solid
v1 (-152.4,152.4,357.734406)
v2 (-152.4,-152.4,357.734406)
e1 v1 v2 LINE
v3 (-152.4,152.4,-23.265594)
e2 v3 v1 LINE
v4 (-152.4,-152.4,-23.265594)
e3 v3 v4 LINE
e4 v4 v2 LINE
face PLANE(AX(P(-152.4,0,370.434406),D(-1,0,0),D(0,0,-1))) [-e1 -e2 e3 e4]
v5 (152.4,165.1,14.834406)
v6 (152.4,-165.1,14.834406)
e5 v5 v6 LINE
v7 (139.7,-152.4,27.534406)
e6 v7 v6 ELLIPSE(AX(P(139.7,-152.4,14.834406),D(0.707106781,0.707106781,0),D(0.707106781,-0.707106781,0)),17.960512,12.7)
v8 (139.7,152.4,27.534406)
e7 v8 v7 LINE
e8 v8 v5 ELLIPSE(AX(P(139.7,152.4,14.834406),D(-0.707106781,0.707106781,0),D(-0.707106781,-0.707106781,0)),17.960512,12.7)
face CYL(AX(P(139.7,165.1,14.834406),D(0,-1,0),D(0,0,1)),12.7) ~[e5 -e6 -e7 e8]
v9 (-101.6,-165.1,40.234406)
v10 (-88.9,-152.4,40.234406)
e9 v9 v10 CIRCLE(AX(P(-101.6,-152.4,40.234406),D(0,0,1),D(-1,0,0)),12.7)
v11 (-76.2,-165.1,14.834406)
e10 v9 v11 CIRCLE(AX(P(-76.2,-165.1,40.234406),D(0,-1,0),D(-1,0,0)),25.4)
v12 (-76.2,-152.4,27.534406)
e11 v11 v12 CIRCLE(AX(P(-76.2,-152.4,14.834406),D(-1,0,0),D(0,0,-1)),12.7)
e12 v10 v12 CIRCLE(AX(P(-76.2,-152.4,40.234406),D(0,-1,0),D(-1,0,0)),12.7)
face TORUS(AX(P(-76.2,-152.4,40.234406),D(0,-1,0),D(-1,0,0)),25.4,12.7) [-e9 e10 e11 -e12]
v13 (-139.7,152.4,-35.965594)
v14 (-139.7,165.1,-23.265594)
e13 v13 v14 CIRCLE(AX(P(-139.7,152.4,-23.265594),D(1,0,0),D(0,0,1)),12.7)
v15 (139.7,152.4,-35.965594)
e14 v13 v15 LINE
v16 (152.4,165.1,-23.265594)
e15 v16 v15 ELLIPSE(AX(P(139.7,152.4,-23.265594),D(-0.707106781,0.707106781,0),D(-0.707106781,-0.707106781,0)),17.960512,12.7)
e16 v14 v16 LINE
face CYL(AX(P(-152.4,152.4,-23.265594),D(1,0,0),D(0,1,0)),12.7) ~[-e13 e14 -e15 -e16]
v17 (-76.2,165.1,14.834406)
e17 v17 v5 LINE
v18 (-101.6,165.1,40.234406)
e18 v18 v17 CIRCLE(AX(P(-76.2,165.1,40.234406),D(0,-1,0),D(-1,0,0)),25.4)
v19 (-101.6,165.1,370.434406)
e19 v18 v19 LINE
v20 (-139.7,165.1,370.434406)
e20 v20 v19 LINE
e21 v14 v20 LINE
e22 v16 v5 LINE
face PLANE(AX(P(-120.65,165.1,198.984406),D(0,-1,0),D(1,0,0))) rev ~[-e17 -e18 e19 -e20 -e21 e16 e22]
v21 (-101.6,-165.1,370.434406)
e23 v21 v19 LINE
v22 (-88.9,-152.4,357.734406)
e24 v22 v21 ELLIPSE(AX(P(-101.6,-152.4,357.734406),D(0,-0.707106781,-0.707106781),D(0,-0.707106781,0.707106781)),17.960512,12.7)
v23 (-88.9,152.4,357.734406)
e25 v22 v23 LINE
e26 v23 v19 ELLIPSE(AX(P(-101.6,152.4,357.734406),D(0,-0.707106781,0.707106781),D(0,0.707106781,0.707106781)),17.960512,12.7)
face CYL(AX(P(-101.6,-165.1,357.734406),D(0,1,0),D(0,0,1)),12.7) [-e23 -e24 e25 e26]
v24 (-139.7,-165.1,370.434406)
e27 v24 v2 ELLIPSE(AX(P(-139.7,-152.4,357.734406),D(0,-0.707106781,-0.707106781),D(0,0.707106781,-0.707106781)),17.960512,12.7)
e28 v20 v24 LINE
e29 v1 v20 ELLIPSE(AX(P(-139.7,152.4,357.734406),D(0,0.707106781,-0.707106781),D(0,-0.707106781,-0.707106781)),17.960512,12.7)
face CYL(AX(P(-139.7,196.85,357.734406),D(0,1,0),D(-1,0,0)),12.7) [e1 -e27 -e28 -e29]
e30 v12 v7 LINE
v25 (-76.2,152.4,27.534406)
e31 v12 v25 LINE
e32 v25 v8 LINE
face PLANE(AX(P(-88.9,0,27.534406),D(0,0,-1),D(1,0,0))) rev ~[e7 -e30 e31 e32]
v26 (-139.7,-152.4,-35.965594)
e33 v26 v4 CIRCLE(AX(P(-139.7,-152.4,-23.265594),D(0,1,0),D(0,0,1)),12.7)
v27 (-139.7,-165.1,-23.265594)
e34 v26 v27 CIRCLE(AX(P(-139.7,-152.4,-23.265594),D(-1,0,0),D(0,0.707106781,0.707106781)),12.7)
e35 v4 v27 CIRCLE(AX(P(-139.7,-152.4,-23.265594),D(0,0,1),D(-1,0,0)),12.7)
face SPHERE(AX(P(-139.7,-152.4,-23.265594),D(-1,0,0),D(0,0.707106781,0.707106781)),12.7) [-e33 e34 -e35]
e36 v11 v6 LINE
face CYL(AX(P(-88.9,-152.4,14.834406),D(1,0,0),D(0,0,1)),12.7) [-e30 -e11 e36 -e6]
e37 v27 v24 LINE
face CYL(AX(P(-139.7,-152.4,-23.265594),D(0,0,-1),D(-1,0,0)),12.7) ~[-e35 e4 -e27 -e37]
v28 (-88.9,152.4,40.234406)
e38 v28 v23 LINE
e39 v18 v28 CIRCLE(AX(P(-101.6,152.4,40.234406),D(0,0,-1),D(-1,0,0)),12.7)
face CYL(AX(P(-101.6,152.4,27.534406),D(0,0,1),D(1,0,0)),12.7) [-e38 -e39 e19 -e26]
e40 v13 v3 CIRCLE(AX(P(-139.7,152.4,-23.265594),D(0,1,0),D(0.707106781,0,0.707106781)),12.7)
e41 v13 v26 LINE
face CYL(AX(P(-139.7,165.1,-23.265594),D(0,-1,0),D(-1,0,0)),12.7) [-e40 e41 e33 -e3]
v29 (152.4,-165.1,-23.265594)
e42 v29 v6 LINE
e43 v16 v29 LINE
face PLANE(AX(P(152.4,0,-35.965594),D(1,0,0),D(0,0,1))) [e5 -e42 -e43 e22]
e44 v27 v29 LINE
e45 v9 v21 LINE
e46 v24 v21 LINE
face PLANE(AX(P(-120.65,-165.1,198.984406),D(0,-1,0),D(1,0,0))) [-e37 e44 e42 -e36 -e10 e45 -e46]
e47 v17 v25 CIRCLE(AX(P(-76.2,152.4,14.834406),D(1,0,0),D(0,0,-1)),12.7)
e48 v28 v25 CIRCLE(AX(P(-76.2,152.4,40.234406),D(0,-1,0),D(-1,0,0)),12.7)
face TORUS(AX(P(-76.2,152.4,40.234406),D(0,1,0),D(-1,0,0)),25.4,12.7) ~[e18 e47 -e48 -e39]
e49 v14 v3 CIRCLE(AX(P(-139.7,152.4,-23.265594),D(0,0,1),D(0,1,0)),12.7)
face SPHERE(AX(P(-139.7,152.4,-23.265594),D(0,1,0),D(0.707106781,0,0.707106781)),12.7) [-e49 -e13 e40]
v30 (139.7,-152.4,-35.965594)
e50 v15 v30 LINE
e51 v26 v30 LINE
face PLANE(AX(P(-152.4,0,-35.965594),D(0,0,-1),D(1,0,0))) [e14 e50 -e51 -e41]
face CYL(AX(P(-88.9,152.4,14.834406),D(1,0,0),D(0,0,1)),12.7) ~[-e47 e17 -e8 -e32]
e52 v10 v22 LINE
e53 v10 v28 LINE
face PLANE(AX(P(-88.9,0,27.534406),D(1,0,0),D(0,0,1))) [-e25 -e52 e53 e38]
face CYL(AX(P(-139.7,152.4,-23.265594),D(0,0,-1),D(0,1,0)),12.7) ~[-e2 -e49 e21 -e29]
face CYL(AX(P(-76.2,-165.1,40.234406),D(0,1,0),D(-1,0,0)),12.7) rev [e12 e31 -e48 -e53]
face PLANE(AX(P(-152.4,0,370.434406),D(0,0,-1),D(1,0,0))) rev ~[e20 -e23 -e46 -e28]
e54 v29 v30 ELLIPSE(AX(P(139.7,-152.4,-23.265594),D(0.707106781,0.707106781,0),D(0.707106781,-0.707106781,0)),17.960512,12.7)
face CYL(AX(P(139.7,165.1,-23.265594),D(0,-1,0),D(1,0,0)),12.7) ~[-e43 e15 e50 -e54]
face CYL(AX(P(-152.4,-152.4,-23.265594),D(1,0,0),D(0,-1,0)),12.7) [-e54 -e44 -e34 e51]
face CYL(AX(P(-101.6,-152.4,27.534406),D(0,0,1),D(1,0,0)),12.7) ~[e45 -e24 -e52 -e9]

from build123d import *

# Parameters (mm, degrees)
F0_W         = 63.5
F0_H         = 342.9
F0_H_2       = 63.5
F0_W_2       = 241.3
F1_DEPTH     = 165.1
F2_R         = 12.7
F3_R         = 12.7
F4_T1_DEPTH  = 425.45
F4_T3_DEPTH  = 393.7
F4_S7_W      = 12.7
F4_S7_H      = 12.7
F4_T8_DEPTH  = 12.7
F4_S13_W     = 12.7
F4_S13_H     = 12.7
F4_T14_DEPTH = 12.7


# Not quite as in the source:
# - a fillet or chamfer that OpenCascade refuses, or shapes differently, is made with other operations: its cross-section is extruded or revolved along the edge and cut away or added


with BuildPart() as f1:
    # F0 (on Front) → F1 (new body, symmetric)
    with BuildSketch(Plane.XZ):
        with Locations((-120.65, 198.9844056189)):
            Rectangle(F0_W, F0_H)
        with Locations((-120.65, -4.2155943811)):
            Rectangle(F0_W, F0_H_2)
        with Locations((31.75, -4.2155943811)):
            Rectangle(F0_W_2, F0_H_2)
    extrude(amount=F1_DEPTH, both=True)

    # F2
    f2_edges = [f1.edges().sort_by_distance(p)[0] for p in [
        (31.75, -165.1, 27.534406),
        (152.4, 0, 27.534406),
        (31.75, 165.1, 27.534406),
        (-88.9, 0, 27.534406),
        (-88.9, 165.1, 198.984406),
        (-88.9, -165.1, 198.984406),
        (-88.9, 0, 370.434406),
    ]]
    fillet(f2_edges, radius=F2_R)

    # F3
    f3_edges = [f1.edges().sort_by_distance(p)[0] for p in [
        (0, -165.1, -35.965594),
        (152.4, 0, -35.965594),
        (0, 165.1, -35.965594),
        (-152.4, 0, -35.965594),
    ]]
    fillet(f3_edges, radius=F3_R)

    # F4: fillet of radius 12.7 on 3 edges, made by hand

    # F4_s2 → F4_t1 (cut)
    with BuildSketch(Plane.XY.offset(-23.2655943811)):
        with BuildLine():
            ThreePointArc((-152.4, -152.4), (-148.6802561211, -161.3802561211), (-139.7, -165.1))
            Line((-139.7, -165.1), (-152.4, -165.1))
            Line((-152.4, -165.1), (-152.4, -152.4))
        make_face()
        with BuildLine():
            ThreePointArc((-139.7, 165.1), (-148.6802561211, 161.3802561211), (-152.4, 152.4))
            Line((-152.4, 152.4), (-152.4, 165.1))
            Line((-152.4, 165.1), (-139.7, 165.1))
        make_face()
    extrude(amount=F4_T1_DEPTH, mode=Mode.SUBTRACT)

    # F4_s4 → F4_t3 (cut)
    with BuildSketch(Plane.XZ.offset(-196.85)):
        with BuildLine():
            ThreePointArc((-152.4, 357.7344056189), (-148.6802561211, 366.71466174), (-139.7, 370.4344056189))
            Line((-139.7, 370.4344056189), (-152.4, 370.4344056189))
            Line((-152.4, 370.4344056189), (-152.4, 357.7344056189))
        make_face()
    extrude(amount=F4_T3_DEPTH, mode=Mode.SUBTRACT)


with BuildPart() as f4_tool6:
    # F4_s7 → F4_t8 (new body)
    with BuildSketch(Plane.XZ.offset(-152.4)):
        with Locations((-146.05, -29.6155943811)):
            Rectangle(F4_S7_W, F4_S7_H)
    extrude(amount=-F4_T8_DEPTH)

    # F4_s9 → F4_t10 (revolve, cut)
    with BuildSketch(Plane(origin=(-139.7, 152.4, -23.2655943811), x_dir=(0.7071067812, 0, 0.7071067812), z_dir=(-0.7071067812, 0, 0.7071067812))):
        with BuildLine():
            ThreePointArc((0, -12.7), (12.7, 0), (0, 12.7))
            Line((0, 12.7), (0, -12.7))
        make_face()
    revolve(axis=Axis((-139.7, 152.4, -23.2655943811), (0, 1, 0)), mode=Mode.SUBTRACT)


with BuildPart() as f1_1:
    add(f1.part)

    # F4_t5: cut F4_tool6
    add(f4_tool6.part, mode=Mode.SUBTRACT)


with BuildPart() as f4_tool12:
    # F4_s13 → F4_t14 (new body)
    with BuildSketch(Plane.YZ.offset(-139.7)):
        with Locations((-158.75, -29.6155943811)):
            Rectangle(F4_S13_W, F4_S13_H)
    extrude(amount=-F4_T14_DEPTH)

    # F4_s15 → F4_t16 (revolve, cut)
    with BuildSketch(Plane(origin=(-139.7, -152.4, -23.2655943811), x_dir=(0, 0.7071067812, 0.7071067812), z_dir=(0, -0.7071067812, 0.7071067812))):
        with BuildLine():
            ThreePointArc((0, -12.7), (12.7, 0), (0, 12.7))
            Line((0, 12.7), (0, -12.7))
        make_face()
    revolve(axis=Axis((-139.7, -152.4, -23.2655943811), (-1, 0, 0)), mode=Mode.SUBTRACT)


with BuildPart() as f1_2:
    add(f1_1.part)

    # F4_t11: cut F4_tool12
    add(f4_tool12.part, mode=Mode.SUBTRACT)


solid = f1_2.part
